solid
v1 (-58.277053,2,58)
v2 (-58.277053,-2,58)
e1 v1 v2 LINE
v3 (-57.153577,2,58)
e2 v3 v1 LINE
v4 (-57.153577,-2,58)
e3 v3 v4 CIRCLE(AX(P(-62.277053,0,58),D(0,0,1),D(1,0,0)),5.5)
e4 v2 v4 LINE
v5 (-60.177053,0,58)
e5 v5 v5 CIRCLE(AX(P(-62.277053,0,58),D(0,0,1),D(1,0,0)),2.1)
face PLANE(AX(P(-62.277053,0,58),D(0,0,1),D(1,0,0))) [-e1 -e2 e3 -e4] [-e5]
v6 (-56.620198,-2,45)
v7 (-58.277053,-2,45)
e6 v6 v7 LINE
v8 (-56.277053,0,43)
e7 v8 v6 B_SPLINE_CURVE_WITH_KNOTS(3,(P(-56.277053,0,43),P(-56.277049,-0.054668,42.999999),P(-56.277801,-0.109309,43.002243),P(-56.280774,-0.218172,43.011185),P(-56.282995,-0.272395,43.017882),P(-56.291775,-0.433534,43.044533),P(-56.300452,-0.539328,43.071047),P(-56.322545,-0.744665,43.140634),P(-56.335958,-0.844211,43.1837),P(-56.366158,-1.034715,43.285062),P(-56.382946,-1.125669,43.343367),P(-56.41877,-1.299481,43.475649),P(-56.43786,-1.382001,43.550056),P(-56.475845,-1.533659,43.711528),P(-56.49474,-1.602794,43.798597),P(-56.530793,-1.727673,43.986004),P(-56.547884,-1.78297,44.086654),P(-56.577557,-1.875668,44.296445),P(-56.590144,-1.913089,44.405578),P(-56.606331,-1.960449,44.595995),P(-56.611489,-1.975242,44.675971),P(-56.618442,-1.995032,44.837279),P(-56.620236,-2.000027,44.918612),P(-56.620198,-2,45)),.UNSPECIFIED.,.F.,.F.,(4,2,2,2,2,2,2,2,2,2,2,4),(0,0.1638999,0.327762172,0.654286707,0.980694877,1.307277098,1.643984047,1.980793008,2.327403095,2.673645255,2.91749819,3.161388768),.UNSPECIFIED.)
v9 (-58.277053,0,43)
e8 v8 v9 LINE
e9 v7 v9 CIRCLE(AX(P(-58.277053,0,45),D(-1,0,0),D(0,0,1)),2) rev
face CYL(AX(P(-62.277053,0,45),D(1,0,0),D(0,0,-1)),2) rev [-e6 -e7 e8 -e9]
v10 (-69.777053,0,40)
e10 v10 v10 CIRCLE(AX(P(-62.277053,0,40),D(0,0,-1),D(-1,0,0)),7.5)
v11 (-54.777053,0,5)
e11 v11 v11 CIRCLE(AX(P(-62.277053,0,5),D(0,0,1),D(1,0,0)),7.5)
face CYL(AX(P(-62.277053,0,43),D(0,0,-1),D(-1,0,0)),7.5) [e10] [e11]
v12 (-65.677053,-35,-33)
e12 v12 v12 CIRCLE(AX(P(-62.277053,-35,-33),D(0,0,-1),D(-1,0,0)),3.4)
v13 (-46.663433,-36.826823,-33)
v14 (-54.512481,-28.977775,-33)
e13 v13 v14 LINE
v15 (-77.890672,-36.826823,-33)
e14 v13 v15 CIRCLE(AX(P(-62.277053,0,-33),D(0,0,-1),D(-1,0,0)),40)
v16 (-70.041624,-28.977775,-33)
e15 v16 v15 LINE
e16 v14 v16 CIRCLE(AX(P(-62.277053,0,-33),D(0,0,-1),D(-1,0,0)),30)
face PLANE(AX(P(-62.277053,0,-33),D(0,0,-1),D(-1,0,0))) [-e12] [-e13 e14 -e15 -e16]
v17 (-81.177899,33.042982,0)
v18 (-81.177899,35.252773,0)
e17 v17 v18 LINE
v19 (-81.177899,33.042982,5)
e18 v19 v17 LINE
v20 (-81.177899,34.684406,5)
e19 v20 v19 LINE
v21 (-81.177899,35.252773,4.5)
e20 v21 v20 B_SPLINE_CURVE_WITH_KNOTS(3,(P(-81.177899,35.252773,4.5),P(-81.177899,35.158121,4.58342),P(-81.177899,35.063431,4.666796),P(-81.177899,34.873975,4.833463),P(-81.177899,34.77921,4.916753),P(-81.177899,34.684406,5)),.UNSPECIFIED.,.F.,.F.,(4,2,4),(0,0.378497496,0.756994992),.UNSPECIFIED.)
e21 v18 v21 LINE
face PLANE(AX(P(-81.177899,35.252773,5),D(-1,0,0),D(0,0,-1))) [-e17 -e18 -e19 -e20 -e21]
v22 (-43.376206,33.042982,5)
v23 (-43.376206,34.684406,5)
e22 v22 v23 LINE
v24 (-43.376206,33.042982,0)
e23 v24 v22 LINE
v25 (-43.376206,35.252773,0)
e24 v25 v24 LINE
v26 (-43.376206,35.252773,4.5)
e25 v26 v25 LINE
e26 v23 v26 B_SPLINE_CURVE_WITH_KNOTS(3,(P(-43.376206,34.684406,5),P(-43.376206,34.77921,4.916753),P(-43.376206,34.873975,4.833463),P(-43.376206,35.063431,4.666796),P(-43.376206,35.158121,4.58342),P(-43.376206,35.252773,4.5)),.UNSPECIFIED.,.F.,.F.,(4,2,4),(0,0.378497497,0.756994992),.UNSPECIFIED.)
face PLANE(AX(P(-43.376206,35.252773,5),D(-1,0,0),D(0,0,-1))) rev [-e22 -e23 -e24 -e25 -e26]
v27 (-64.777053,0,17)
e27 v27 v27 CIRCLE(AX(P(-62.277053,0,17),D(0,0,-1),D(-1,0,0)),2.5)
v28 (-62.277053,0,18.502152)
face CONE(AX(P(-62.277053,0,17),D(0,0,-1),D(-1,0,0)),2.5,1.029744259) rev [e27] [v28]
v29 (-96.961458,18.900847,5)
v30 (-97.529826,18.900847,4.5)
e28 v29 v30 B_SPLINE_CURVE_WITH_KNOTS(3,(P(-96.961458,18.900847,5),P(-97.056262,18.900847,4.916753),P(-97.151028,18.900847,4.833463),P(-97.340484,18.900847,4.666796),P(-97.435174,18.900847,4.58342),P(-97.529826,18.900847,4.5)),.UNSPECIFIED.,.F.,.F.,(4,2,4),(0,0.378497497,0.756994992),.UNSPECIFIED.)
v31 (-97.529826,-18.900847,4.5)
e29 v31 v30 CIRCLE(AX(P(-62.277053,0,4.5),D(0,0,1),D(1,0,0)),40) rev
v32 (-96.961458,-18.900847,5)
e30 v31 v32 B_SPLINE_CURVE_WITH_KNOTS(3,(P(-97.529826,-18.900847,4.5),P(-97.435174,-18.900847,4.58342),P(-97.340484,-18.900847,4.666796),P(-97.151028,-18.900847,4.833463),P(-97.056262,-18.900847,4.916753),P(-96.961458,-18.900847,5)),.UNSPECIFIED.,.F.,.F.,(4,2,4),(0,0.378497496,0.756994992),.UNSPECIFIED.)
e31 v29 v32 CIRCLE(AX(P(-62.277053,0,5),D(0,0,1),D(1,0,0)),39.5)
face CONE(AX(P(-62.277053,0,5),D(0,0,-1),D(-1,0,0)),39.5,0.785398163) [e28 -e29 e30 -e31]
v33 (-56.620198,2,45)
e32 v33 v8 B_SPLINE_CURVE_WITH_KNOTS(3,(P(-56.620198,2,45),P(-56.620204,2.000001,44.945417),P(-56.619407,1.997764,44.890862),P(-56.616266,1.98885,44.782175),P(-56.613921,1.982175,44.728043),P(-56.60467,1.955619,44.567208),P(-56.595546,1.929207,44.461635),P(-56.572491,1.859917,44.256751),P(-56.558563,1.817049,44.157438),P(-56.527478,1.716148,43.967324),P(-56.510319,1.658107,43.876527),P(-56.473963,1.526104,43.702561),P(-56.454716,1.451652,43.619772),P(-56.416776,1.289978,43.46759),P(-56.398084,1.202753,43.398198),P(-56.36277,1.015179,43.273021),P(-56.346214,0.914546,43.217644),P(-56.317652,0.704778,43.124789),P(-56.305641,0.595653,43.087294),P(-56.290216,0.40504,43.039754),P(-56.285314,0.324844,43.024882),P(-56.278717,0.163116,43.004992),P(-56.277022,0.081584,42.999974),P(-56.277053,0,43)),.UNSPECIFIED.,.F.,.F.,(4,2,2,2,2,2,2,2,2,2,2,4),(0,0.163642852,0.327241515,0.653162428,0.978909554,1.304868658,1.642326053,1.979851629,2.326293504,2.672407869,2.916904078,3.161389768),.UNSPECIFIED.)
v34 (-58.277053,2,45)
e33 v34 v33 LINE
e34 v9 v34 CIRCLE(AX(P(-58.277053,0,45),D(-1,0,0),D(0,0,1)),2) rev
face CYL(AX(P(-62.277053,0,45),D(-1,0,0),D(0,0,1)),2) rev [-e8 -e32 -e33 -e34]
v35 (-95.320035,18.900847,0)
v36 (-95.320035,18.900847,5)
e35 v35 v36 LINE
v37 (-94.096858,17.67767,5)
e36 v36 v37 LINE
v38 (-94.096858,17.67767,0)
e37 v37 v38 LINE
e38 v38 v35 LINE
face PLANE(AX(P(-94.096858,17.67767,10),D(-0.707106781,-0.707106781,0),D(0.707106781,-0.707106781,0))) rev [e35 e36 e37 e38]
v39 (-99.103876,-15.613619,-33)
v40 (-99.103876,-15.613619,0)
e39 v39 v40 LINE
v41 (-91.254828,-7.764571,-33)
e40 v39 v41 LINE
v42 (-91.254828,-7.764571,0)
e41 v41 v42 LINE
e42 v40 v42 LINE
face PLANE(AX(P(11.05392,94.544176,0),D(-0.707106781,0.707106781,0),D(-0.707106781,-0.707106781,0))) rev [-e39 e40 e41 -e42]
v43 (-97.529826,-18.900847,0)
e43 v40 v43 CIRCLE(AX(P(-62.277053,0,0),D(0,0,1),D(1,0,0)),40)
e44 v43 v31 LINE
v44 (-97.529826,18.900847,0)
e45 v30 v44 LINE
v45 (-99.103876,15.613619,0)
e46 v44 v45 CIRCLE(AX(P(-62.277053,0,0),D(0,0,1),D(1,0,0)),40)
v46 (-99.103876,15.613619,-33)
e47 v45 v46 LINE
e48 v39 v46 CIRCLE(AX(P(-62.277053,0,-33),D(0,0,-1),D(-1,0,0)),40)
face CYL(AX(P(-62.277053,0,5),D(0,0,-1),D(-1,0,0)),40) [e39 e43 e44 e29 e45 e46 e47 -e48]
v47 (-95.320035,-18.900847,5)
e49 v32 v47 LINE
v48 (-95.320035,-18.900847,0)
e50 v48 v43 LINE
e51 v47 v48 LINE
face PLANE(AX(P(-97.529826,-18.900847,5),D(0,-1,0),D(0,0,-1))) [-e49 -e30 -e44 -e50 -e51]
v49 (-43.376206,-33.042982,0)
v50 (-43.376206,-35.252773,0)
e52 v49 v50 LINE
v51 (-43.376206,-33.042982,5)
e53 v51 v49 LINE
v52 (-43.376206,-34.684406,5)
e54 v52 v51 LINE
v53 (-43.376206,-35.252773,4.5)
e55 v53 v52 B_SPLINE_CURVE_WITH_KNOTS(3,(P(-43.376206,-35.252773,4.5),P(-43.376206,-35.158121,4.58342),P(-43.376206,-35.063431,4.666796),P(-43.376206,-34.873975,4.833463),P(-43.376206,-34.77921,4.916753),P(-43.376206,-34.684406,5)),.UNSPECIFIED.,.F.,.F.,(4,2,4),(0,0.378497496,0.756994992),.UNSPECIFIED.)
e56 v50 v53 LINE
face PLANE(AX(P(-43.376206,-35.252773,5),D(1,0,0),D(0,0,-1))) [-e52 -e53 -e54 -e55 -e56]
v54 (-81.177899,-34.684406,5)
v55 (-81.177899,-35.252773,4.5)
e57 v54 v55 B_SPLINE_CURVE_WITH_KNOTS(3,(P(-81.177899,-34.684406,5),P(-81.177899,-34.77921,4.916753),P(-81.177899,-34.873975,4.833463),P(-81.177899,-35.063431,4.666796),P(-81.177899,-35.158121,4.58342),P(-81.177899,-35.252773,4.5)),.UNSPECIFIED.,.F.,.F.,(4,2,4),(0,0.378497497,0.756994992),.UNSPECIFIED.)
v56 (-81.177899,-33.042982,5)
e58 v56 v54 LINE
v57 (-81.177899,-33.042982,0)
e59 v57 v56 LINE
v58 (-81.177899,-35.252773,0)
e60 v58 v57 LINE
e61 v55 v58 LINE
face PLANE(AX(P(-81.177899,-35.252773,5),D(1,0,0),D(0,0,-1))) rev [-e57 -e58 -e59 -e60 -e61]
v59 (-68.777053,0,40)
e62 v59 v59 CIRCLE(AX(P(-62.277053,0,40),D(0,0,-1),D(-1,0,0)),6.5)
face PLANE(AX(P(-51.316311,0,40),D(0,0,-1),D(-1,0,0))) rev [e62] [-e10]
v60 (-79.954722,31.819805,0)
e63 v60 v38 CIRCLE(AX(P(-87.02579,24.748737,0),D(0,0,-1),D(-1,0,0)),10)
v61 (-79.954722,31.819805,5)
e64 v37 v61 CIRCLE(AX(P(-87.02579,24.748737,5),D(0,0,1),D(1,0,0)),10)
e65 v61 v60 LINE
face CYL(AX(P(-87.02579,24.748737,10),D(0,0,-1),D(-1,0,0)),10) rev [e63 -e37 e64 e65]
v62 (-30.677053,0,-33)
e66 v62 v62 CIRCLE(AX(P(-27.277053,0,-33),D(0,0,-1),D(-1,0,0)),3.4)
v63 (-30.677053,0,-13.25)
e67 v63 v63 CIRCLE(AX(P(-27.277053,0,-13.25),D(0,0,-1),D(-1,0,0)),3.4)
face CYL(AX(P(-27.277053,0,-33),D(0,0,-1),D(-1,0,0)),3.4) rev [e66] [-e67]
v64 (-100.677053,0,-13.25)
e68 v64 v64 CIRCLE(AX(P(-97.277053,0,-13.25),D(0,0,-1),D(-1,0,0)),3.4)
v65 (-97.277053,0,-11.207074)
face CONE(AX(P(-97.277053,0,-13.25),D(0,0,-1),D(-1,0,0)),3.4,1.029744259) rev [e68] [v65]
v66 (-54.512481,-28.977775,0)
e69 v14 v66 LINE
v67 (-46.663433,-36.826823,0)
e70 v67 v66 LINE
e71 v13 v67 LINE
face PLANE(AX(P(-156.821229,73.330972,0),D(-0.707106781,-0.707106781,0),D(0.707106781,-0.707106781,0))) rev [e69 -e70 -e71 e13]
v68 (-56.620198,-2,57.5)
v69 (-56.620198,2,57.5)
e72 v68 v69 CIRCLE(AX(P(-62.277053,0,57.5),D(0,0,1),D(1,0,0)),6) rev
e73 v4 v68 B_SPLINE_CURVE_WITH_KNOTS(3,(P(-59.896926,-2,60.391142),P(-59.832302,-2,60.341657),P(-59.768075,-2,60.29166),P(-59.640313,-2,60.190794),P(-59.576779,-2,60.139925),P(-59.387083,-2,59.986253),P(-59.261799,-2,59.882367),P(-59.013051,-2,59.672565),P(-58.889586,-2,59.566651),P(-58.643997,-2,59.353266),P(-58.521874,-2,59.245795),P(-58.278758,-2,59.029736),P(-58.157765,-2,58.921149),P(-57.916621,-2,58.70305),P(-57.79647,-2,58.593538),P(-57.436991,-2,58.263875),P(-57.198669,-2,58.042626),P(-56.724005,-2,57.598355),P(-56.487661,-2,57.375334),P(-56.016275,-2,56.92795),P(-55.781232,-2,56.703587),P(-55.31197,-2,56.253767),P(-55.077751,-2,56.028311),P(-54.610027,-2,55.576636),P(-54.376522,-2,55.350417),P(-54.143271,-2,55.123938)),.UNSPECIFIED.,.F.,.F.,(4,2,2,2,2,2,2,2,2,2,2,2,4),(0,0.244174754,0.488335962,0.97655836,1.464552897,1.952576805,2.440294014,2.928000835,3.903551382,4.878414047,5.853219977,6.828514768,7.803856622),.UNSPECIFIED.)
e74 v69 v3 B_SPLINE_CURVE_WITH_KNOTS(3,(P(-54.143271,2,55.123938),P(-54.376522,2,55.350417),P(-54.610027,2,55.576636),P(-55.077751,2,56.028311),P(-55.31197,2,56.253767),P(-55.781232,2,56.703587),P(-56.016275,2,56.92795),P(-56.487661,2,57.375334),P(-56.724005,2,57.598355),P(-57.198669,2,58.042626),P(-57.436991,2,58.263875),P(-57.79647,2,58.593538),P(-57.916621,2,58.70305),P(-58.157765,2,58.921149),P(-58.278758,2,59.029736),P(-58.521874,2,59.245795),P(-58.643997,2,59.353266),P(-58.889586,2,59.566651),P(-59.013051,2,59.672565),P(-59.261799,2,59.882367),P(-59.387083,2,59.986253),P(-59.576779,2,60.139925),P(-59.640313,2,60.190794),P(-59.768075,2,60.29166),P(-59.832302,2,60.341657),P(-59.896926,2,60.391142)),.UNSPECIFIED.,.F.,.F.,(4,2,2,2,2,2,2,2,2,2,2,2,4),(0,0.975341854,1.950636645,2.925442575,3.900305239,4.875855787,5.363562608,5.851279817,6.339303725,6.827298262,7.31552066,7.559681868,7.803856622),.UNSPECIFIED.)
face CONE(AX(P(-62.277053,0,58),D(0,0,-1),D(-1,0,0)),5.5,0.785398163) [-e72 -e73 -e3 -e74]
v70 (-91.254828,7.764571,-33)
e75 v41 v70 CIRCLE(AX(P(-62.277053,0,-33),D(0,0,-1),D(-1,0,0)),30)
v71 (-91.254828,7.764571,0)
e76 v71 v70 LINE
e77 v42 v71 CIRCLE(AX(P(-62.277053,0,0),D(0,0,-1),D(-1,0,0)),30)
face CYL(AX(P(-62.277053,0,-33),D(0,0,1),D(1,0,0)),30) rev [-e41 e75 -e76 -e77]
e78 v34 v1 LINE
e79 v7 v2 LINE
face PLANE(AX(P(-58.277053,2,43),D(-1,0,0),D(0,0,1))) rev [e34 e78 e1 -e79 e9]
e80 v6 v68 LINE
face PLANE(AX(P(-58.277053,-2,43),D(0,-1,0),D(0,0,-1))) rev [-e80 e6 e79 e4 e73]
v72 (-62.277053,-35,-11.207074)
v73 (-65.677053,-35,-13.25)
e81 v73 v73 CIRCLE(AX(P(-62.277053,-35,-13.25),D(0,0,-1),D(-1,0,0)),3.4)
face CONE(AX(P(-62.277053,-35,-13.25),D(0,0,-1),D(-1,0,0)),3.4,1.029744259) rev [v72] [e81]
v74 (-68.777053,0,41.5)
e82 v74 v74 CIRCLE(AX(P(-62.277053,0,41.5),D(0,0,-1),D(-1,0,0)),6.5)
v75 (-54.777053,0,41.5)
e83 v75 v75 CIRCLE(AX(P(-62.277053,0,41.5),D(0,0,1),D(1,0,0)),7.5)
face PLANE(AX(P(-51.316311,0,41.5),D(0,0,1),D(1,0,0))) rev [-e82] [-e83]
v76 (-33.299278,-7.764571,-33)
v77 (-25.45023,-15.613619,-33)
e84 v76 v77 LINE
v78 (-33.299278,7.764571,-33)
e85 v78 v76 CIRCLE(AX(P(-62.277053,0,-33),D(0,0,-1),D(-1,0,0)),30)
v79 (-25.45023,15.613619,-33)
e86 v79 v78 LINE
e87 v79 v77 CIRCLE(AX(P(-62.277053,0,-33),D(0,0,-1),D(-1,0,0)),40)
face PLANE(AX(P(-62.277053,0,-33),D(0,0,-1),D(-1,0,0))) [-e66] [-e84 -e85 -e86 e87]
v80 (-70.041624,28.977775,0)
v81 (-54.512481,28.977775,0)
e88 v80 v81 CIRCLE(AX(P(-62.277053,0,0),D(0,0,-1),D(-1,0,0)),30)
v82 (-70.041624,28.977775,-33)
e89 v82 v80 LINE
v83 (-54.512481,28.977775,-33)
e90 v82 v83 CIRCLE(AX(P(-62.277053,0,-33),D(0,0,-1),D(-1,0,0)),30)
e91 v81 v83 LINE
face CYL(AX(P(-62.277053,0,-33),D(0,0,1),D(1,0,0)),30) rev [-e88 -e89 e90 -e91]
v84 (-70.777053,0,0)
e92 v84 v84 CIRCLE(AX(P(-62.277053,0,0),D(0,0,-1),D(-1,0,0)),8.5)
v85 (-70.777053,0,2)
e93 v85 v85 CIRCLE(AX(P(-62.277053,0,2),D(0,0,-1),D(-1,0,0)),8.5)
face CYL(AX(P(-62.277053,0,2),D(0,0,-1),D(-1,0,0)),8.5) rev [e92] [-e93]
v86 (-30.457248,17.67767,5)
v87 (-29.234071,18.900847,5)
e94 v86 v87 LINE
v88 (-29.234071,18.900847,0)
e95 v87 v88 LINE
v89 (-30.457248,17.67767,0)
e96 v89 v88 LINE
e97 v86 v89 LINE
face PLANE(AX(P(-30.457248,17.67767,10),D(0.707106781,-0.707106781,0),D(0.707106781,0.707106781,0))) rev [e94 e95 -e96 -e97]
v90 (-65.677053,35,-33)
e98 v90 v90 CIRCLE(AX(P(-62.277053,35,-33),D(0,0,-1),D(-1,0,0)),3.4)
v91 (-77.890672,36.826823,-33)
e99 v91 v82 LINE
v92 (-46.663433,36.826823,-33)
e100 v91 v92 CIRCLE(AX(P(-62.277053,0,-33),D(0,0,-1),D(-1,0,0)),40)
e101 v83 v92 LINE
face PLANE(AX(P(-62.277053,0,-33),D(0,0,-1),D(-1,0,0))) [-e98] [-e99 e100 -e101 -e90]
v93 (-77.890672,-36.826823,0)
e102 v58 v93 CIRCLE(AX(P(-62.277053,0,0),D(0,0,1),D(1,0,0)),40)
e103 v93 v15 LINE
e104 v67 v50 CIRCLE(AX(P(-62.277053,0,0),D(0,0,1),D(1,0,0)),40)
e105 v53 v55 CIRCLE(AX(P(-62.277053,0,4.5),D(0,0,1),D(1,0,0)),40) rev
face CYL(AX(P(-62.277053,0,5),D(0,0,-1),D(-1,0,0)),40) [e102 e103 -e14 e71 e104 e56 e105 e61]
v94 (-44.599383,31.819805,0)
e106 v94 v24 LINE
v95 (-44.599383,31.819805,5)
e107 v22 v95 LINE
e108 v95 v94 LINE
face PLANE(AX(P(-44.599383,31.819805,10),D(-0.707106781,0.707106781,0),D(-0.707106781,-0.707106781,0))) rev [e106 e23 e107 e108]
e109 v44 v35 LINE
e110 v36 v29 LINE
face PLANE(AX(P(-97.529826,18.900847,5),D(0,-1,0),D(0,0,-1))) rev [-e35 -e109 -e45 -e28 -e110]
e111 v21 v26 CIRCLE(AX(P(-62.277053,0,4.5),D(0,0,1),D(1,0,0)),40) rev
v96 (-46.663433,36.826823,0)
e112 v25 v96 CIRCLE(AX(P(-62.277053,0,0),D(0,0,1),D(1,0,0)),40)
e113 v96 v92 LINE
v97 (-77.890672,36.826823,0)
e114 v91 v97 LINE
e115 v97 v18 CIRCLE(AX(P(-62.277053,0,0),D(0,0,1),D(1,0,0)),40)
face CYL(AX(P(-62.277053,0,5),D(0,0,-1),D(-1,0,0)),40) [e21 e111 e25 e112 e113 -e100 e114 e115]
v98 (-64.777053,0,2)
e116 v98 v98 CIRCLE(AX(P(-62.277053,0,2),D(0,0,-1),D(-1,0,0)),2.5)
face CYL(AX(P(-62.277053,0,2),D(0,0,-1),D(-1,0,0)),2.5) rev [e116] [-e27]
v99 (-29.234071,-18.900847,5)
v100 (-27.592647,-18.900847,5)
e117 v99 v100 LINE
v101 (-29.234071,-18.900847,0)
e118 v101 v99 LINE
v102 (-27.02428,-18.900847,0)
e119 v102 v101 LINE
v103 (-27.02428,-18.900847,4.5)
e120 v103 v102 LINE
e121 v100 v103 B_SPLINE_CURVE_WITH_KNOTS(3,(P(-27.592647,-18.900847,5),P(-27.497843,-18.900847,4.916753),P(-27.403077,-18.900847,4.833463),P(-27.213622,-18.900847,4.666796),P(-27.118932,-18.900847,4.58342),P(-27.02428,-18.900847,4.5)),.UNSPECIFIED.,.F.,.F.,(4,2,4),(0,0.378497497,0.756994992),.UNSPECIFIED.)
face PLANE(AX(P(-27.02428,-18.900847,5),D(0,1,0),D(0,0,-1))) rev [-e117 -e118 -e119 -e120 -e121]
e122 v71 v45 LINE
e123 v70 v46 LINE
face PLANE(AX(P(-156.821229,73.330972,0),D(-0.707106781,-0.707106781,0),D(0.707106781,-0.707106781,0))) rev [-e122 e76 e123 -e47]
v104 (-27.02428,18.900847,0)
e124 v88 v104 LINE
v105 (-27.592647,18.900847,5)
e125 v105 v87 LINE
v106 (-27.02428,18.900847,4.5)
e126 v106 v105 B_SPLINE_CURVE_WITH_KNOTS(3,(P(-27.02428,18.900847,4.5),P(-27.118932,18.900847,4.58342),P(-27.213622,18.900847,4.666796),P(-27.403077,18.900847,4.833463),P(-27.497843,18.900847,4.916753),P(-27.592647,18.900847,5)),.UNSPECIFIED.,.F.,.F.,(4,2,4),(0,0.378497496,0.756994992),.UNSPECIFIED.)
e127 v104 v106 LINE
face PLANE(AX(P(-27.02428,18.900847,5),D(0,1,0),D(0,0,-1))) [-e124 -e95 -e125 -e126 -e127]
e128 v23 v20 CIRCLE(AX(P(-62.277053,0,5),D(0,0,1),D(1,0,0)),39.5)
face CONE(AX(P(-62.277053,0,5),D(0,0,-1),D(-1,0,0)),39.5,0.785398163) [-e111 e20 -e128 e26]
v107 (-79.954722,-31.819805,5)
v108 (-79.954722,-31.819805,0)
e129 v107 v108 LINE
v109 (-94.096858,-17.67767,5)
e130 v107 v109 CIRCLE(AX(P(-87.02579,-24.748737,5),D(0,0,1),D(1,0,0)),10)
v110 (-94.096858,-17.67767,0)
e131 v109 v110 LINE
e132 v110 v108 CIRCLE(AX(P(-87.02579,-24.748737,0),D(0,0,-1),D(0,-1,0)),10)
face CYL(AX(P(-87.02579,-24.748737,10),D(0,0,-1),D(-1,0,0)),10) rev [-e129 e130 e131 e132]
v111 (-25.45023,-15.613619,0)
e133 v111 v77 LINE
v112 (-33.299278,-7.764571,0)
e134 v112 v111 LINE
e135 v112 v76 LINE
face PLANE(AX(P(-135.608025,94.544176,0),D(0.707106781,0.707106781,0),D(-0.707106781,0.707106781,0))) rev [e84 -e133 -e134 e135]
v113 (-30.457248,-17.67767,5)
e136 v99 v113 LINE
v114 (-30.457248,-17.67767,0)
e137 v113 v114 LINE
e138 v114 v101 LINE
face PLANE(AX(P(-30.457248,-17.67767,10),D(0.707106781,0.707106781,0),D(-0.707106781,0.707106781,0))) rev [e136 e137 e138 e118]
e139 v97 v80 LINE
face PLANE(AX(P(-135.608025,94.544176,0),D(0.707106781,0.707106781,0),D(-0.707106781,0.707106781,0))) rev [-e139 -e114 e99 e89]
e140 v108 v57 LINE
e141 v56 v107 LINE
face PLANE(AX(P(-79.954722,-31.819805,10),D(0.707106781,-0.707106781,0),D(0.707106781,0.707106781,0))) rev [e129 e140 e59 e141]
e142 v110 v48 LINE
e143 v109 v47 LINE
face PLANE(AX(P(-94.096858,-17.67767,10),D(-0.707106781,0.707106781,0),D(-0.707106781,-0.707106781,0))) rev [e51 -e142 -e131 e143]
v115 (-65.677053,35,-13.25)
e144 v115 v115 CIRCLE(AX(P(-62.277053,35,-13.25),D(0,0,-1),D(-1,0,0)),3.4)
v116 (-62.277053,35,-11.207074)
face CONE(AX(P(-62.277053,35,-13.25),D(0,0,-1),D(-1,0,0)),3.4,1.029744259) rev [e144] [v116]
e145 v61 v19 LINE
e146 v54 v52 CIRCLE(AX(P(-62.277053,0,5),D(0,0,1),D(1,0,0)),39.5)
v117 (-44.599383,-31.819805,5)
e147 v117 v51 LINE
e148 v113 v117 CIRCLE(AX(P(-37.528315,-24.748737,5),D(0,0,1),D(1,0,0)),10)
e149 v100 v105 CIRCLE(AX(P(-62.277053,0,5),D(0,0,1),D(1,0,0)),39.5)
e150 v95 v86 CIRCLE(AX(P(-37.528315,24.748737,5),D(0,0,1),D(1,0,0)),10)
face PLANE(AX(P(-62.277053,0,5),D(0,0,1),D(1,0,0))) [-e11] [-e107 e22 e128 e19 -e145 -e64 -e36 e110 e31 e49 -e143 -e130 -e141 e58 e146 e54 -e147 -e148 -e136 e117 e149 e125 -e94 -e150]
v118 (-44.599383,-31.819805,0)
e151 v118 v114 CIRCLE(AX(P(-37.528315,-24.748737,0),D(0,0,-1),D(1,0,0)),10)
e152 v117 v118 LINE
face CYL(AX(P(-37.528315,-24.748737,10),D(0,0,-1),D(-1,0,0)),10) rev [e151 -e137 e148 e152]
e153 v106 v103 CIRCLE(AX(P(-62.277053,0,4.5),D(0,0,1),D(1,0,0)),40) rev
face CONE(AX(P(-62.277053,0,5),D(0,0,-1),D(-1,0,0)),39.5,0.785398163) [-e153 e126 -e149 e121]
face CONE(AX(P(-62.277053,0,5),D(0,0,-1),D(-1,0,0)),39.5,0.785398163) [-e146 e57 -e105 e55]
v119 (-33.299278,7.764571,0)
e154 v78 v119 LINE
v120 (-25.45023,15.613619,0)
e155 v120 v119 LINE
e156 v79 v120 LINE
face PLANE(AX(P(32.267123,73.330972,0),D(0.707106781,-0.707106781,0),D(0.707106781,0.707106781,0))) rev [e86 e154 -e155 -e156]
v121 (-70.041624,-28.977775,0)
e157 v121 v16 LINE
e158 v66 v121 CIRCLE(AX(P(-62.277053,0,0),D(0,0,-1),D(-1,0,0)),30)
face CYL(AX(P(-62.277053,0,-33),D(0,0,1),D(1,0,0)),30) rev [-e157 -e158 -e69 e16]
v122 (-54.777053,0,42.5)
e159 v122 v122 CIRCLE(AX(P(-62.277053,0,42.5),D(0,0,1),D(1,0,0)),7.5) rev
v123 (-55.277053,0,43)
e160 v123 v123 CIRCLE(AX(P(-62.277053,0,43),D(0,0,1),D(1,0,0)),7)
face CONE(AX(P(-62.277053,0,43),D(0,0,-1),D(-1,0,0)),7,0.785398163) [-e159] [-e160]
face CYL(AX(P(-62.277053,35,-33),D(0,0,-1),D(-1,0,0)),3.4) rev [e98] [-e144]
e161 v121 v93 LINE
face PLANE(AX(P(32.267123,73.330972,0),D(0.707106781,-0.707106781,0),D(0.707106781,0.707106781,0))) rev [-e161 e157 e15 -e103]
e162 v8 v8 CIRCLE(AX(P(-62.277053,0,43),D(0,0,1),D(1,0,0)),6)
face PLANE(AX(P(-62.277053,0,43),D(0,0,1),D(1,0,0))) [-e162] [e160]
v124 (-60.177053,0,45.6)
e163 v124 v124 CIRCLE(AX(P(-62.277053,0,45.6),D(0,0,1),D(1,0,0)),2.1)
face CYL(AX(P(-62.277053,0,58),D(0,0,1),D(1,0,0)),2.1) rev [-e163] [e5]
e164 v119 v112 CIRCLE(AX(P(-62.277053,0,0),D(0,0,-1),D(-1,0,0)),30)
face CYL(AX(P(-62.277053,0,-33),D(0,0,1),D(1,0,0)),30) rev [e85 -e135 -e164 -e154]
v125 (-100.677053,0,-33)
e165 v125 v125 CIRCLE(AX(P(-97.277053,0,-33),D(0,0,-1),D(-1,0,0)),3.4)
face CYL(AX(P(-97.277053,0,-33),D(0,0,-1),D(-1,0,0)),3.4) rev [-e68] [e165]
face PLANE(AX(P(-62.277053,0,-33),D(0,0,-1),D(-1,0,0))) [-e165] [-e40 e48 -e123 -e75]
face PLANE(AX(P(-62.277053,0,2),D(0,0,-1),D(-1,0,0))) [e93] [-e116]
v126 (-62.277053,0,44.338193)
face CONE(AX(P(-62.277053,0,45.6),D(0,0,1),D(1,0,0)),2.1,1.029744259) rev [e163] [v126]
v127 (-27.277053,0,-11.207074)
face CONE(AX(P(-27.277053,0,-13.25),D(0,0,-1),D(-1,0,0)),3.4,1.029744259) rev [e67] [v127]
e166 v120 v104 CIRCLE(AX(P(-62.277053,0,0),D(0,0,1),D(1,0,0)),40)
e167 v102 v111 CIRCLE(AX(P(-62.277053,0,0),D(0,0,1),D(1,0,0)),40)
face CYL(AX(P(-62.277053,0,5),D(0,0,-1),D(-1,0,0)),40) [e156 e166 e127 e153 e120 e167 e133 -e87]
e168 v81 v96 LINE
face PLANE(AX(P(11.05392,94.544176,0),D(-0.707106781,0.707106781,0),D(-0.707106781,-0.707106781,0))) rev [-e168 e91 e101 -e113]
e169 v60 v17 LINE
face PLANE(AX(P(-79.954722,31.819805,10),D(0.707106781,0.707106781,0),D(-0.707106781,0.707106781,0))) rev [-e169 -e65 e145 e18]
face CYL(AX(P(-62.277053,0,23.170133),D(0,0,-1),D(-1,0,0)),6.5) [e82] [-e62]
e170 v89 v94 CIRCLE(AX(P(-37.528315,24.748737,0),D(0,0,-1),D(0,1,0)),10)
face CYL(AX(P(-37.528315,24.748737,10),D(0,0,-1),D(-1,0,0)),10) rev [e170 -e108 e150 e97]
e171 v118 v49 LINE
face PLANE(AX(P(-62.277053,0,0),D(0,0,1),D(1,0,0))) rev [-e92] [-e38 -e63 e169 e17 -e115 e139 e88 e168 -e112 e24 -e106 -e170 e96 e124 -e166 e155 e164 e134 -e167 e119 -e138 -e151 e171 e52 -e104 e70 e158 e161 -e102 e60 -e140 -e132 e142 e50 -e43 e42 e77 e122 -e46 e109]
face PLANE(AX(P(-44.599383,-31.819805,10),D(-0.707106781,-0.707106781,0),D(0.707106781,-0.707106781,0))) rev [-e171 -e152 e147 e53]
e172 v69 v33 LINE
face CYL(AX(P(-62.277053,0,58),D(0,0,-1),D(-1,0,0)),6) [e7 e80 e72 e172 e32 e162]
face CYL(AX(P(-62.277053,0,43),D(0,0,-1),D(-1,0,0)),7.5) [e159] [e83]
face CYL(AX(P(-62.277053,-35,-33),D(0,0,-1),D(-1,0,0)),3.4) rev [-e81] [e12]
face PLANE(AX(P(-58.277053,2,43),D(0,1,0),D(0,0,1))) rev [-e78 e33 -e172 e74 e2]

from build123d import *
from build123d.topology import SkipClean

# Parameters (mm, degrees)
SKETCH_1_R               = 40
EXTRUDE_1_DEPTH          = 5
SKETCH_2_R               = 7.5
EXTRUDE_2_DEPTH          = 38
SKETCH_3_W               = 1.5
SKETCH_3_H               = 4.460741585
SKETCH_4_R               = 6
EXTRUDE_3_DEPTH          = 15
CHAMFER_1_SIZE           = 0.5
SKETCH_5_W               = 7.892485333
SKETCH_5_H               = 4
CUT_EXTRUDE_1_DEPTH      = 15
FILLET_1_R               = 2
EXTRUDE_START            = 33
SKETCH_6_R               = 40
SKETCH_6_R_2             = 30
EXTRUDE_4_DEPTH          = 33
PATTERN_CIRCULAR_1_COUNT = 4
CUT_EXTRUDE_2_DEPTH      = 33
PATTERN_CIRCULAR_2_COUNT = 2
PATTERN_CIRCULAR_2_ANGLE = 90
SKETCH_12_R              = 8.5
CUT_EXTRUDE_3_DEPTH      = 2
HOLE_WIZARD_M6_1_D       = 5
HOLE_WIZARD_M6_1_DEPTH   = 15
HOLE_WIZARD_M6_1_TIP     = 1.502151548
CUT_EXTRUDE_4_DEPTH      = 10
PATTERN_CIRCULAR_3_COUNT = 4
CHAMFER_2_SIZE           = 2
HOLE_WIZARD_M5_1_D       = 4.2
HOLE_WIZARD_M5_1_DEPTH   = 12.4
HOLE_WIZARD_M5_1_TIP     = 1.2618073


# Some blends are built 0.0001 mm under size
with BuildPart() as part:
    # 草图1 → 凸台-拉伸1 (new body)
    with BuildSketch(Plane.XY):
        with Locations((-62.277052722, 0)):
            Circle(SKETCH_1_R)
    extrude(amount=EXTRUDE_1_DEPTH)

    # 草图2 → 凸台-拉伸2 (add)
    with BuildSketch(Plane.XY.offset(5)):
        with Locations((-62.277052722, 0)):
            Circle(SKETCH_2_R)
    extrude(amount=EXTRUDE_2_DEPTH)

    # 草图3 → 切除-旋转1 (revolve, cut)
    with BuildSketch(Plane(origin=(0, 0, 0), x_dir=(0, 0, -1), z_dir=(0, -1, 0)), mode=Mode.PRIVATE) as cut_revolve_1_sk:
        with Locations((-40.75, -53.54668193)):
            Rectangle(SKETCH_3_W, SKETCH_3_H)
    revolve(cut_revolve_1_sk.sketch.rotate(Axis((-62.277052722, 0, 23.170133407), (0, 0, 1)), 180), axis=Axis((-62.277052722, 0, 23.170133407), (0, 0, 1)), mode=Mode.SUBTRACT)

    # 草图4 → 凸台-拉伸3 (add)
    with BuildSketch(Plane.XY.offset(43)):
        with Locations((-62.277052722, 0)):
            Circle(SKETCH_4_R)
    extrude(amount=EXTRUDE_3_DEPTH)

    # 倒角1
    chamfer_1_edges = [part.edges().sort_by_distance(p)[0] for p in [
        (-68.277052722, 0, 58),
        (-102.277052722, 0, 5),
        (-69.777052722, 0, 43),
    ]]
    chamfer(chamfer_1_edges, length=CHAMFER_1_SIZE)

    # 草图5 → 切除-拉伸1 (cut)
    with BuildSketch(Plane.XY.offset(58)):
        with Locations((-54.330810056, 0)):
            Rectangle(SKETCH_5_W, SKETCH_5_H)
    extrude(amount=-CUT_EXTRUDE_1_DEPTH, mode=Mode.SUBTRACT)

    # 圆角1
    fillet_1_edges = [part.edges().sort_by_distance(p)[0] for p in [
        (-57.448625597, -2, 43),
        (-57.448625597, 2, 43),
    ]]
    fillet(fillet_1_edges, radius=FILLET_1_R - 0.0001)  # a hair under: the kernel refuses the full size

    # 草图6 → 凸台-拉伸4 (add)
    with SkipClean():  # the faces are left unmerged after this step: merging them gives an invalid solid
        with BuildSketch(Plane(origin=(0, 0, 0), x_dir=(-1, 0, 0), z_dir=(0, 0, -1)).offset(EXTRUDE_START)):
            with Locations((62.277052722, 0)):
                Circle(SKETCH_6_R)
            with Locations((62.277052722, 0)):
                Circle(SKETCH_6_R_2, mode=Mode.SUBTRACT)
        extrude(amount=-EXTRUDE_4_DEPTH)

    # 草图9 → M8 螺纹孔1 (revolve, cut)
    with SkipClean():  # the faces are left unmerged after this step: merging them gives an invalid solid
        with BuildSketch(Plane(origin=(-97.277052722, 0, -33), x_dir=(0, 1, 0), z_dir=(1, 0, 0))):
            Polygon((0, 0), (0, 21.792926105), (3.4, 19.75), (3.4, 0), align=None)
        hole_wizard_m8_1 = revolve(axis=Axis((-97.277052722, 0, -39.35), (0, 0, 1)), mode=Mode.SUBTRACT)

    # 阵列(圆周)1: M8 螺纹孔1 ×4 about axis
    with SkipClean():  # the faces are left unmerged after this step: merging them gives an invalid solid
        pattern_circular_1_axis = Axis((-62.277052722, 0, 0), (0, 0, 1))
        for i in range(1, PATTERN_CIRCULAR_1_COUNT):
            add(hole_wizard_m8_1.rotate(pattern_circular_1_axis, i * 360 / PATTERN_CIRCULAR_1_COUNT), mode=Mode.SUBTRACT)

    # 草图11 → 切除-拉伸2 (cut)
    with SkipClean():  # the faces are left unmerged after this step: merging them gives an invalid solid
        with BuildSketch(Plane(origin=(0, 0, -33), x_dir=(-1, 0, 0), z_dir=(0, 0, -1))):
            Polygon((-32.267123115, 73.330972402), (135.608025124, -94.544175837), (156.82122856, -73.330972402), (-11.05391968, 94.544175837), align=None)
        cut_extrude_2 = extrude(amount=-CUT_EXTRUDE_2_DEPTH, mode=Mode.SUBTRACT)
    add(part.part.scale(1), mode=Mode.REPLACE)  # the faces are merged on a copy

    # 阵列(圆周)2: 切除-拉伸2 ×2 about axis
    pattern_circular_2_axis = Axis((-62.277052722, 0, -33), (0, 0, 1))
    for i in range(1, PATTERN_CIRCULAR_2_COUNT):
        add(cut_extrude_2.rotate(pattern_circular_2_axis, i * PATTERN_CIRCULAR_2_ANGLE / (PATTERN_CIRCULAR_2_COUNT - 1)), mode=Mode.SUBTRACT)

    # 草图12 → 切除-拉伸3 (cut)
    with BuildSketch(Plane(origin=(0, 0, 0), x_dir=(-1, 0, 0), z_dir=(0, 0, -1))):
        with Locations((62.277052722, 0)):
            Circle(SKETCH_12_R)
    extrude(amount=-CUT_EXTRUDE_3_DEPTH, mode=Mode.SUBTRACT)

    # M6 螺纹孔1
    with Locations(Plane(origin=(0, 0, 2), x_dir=(-1, 0, 0), z_dir=(0, 0, -1))):
        with Locations((62.277052722, 0)):
            Hole(HOLE_WIZARD_M6_1_D / 2, depth=HOLE_WIZARD_M6_1_DEPTH)
            with Locations((0, 0, -(HOLE_WIZARD_M6_1_DEPTH + HOLE_WIZARD_M6_1_TIP / 2))):  # 118° drill point
                Cone(0, HOLE_WIZARD_M6_1_D / 2, HOLE_WIZARD_M6_1_TIP, mode=Mode.SUBTRACT)

    # 草图15 → 切除-拉伸4 (cut)
    with BuildSketch(Plane(origin=(0, 0, 0), x_dir=(-1, 0, 0), z_dir=(0, 0, -1))):
        with BuildLine():
            Line((79.954722252, 31.819805153), (83.490256158, 35.355339059))
            ThreePointArc((83.490256158, 35.355339059), (97.632391781, 35.355339059), (97.632391781, 21.213203436))
            Line((97.632391781, 21.213203436), (94.096857875, 17.67766953))
            ThreePointArc((94.096857875, 17.67766953), (79.954722252, 17.67766953), (79.954722252, 31.819805153))
        make_face()
    cut_extrude_4 = extrude(amount=-CUT_EXTRUDE_4_DEPTH, mode=Mode.SUBTRACT)

    # 阵列(圆周)3: 切除-拉伸4 ×4 about axis
    pattern_circular_3_axis = Axis((-62.277052722, 0, 0), (0, 0, 1))
    for i in range(1, PATTERN_CIRCULAR_3_COUNT):
        add(cut_extrude_4.rotate(pattern_circular_3_axis, i * 360 / PATTERN_CIRCULAR_3_COUNT), mode=Mode.SUBTRACT)

    # 倒角2
    # the kernel refuses this chamfer: 2, 1.641704769 mm, written as the material it takes off along each edge
    with BuildSketch(Plane(origin=(-41.961992659, -34.457195687, 9.643365976), x_dir=(-0.8715539040567665, -0.4902996964341389, 0), z_dir=(0, 0, -1)), Plane(origin=(-27.819857035, 20.315060063, 9.643365976), x_dir=(0.49029969643413934, -0.8715539040567662, 0), z_dir=(0, 0, -1)), Plane(origin=(-82.592112785, 34.457195687, 9.643365976), x_dir=(0.8715539040567699, 0.4902996964341327, 0), z_dir=(0, 0, -1)), Plane(origin=(-96.734248409, -20.315060063, 9.643365976), x_dir=(-0.4902996964341341, 0.8715539040567691, 0), z_dir=(0, 0, -1))) as chamfer_2_piece_1:
        with BuildLine():
            Line((1.622634648, 0), (CHAMFER_2_SIZE * 0.269587435566, CHAMFER_2_SIZE * 0.96297591589))
            Line((CHAMFER_2_SIZE * 0.269587435566, CHAMFER_2_SIZE * 0.96297591589), (0, 0))
            ThreePointArc((0, 0), (0.83091626, -0.008223992), (1.622634648, 0))
        make_face()
    extrude(amount=14.786731952, mode=Mode.SUBTRACT)
    with BuildSketch(Plane(origin=(-27.819857035, -20.315060063, 9.643365976), x_dir=(0.49029969643413596, 0.871553904056768, 0), z_dir=(0, 0, -1)), Plane(origin=(-41.961992659, 34.457195687, 9.643365976), x_dir=(-0.8715539040567644, 0.4902996964341427, 0), z_dir=(0, 0, -1)), Plane(origin=(-96.734248409, 20.315060063, 9.643365976), x_dir=(-0.49029969643413984, -0.8715539040567659, 0), z_dir=(0, 0, -1)), Plane(origin=(-82.592112785, -34.457195687, 9.643365976), x_dir=(0.8715539040567665, -0.4902996964341389, 0), z_dir=(0, 0, -1))) as chamfer_2_piece_2:
        with BuildLine():
            Line((1.622634648, 0), (CHAMFER_2_SIZE * 0.269587435566, -CHAMFER_2_SIZE * 0.96297591589))
            Line((CHAMFER_2_SIZE * 0.269587435566, -CHAMFER_2_SIZE * 0.96297591589), (0, 0))
            ThreePointArc((0, 0), (0.83091626, 0.008223992), (1.622634648, 0))
        make_face()
    extrude(amount=14.786731952, mode=Mode.SUBTRACT)

    # M5 螺纹孔1
    with Locations(Plane.XY.offset(58)):
        with Locations((-62.277052722, 0)):
            Hole(HOLE_WIZARD_M5_1_D / 2, depth=HOLE_WIZARD_M5_1_DEPTH)
            with Locations((0, 0, -(HOLE_WIZARD_M5_1_DEPTH + HOLE_WIZARD_M5_1_TIP / 2))):  # 118° drill point
                Cone(0, HOLE_WIZARD_M5_1_D / 2, HOLE_WIZARD_M5_1_TIP, mode=Mode.SUBTRACT)


solid = part.part
